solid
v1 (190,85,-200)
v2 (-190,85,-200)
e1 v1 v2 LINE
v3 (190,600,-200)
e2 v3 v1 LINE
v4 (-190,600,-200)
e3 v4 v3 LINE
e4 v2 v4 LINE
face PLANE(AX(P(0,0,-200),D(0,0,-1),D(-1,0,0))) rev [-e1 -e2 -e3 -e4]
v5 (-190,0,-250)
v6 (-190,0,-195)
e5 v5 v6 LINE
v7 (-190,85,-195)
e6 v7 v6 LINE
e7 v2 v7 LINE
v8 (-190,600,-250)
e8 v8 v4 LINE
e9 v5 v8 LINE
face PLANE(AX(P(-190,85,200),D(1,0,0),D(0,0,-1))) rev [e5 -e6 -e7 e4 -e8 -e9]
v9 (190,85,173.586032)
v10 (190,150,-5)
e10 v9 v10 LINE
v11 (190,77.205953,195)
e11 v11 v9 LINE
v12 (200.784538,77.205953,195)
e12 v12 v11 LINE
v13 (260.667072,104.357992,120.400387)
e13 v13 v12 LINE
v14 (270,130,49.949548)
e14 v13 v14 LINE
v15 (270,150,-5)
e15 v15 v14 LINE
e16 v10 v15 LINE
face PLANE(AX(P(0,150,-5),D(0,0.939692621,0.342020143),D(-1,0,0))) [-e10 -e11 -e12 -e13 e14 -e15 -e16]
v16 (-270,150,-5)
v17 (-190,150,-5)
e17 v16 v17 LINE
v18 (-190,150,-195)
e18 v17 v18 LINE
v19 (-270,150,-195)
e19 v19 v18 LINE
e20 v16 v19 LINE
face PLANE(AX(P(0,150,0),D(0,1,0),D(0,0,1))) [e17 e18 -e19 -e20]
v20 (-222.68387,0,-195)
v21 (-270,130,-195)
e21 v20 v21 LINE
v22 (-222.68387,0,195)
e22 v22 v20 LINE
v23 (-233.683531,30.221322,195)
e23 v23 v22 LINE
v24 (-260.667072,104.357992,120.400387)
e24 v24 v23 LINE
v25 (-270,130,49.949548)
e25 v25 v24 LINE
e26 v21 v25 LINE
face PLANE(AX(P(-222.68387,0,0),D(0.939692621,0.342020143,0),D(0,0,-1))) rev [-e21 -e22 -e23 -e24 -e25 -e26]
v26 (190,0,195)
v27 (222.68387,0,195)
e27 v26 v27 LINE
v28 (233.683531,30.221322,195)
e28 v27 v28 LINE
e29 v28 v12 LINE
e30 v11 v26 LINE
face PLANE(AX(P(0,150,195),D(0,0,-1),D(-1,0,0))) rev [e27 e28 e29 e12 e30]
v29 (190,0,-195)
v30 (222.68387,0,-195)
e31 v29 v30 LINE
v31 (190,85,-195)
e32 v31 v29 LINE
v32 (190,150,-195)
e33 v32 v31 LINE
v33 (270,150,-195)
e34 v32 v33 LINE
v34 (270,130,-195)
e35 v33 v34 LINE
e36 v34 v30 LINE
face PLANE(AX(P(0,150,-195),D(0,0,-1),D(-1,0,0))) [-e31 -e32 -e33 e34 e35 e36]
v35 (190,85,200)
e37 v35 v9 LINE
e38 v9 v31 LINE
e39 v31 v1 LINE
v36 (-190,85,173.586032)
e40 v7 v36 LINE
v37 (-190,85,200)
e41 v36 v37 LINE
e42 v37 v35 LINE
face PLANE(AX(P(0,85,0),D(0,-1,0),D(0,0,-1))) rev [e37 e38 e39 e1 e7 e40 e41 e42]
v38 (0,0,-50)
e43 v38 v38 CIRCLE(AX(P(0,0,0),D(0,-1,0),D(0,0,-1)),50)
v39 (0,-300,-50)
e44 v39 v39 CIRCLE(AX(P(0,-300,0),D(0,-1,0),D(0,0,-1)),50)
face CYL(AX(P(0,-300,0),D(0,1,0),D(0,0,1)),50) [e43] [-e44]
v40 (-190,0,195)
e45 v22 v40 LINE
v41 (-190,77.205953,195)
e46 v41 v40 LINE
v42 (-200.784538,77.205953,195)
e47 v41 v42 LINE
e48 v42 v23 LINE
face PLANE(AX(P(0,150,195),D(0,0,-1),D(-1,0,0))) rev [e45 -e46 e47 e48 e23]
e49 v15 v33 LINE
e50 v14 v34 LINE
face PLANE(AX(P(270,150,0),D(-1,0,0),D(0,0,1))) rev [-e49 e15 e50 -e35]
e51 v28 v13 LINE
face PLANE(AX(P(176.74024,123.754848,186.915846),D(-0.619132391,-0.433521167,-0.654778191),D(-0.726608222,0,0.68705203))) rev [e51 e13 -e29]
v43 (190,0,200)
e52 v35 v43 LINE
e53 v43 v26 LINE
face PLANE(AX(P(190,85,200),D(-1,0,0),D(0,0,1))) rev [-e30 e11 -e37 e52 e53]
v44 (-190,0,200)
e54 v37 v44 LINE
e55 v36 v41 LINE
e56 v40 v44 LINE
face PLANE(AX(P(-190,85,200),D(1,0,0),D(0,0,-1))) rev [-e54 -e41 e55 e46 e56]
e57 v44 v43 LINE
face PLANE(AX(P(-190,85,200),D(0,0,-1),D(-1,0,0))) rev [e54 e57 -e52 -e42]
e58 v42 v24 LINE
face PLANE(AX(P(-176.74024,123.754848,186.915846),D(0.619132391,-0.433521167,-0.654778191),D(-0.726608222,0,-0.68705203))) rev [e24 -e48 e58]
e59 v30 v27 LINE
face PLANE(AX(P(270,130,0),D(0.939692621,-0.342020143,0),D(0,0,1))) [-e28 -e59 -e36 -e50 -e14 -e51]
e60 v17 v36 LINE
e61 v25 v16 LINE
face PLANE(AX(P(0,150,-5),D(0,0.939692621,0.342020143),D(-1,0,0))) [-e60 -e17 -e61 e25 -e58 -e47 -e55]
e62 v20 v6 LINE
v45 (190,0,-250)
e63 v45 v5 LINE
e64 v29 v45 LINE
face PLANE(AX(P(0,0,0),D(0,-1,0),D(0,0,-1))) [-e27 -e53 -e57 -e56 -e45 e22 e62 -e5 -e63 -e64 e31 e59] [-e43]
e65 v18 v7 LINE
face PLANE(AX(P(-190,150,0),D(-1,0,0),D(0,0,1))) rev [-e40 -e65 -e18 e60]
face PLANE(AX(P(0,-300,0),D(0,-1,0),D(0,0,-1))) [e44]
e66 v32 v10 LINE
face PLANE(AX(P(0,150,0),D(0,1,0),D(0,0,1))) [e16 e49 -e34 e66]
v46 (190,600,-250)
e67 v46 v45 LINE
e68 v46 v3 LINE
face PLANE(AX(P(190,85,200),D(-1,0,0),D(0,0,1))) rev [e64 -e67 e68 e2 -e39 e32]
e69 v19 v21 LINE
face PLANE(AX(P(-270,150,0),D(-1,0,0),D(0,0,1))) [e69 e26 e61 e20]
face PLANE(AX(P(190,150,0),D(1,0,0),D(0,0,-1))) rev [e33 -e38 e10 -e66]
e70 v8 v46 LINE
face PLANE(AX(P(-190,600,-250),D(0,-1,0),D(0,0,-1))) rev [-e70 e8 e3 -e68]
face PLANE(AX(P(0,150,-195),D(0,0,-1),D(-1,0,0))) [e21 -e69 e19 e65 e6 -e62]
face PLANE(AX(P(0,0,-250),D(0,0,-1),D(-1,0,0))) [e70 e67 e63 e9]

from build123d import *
from OCP.BRepFilletAPI import BRepFilletAPI_MakeChamfer

# Parameters (mm, degrees)
SKETCH1_W           = 380
SKETCH1_H           = 400
BOSS_EXTRUDE1_DEPTH = 85
SKETCH2_W           = 80
SKETCH2_H           = 390
BOSS_EXTRUDE2_DEPTH = 150
CHAMFER1_SIZE       = 72.794046853
CHAMFER1_SIZE_2     = 200
CHAMFER2_SIZE       = 130
CHAMFER2_SIZE2      = 47.316130455
SKETCH3_W           = 380
SKETCH3_H           = 600
BOSS_EXTRUDE3_DEPTH = 50
SKETCH4_R           = 50
BOSS_EXTRUDE4_DEPTH = 300
CHAMFER3_START      = 285.464373586
CHAMFER3_OUTLINE_W  = 79
CHAMFER3_OUTLINE_H  = 106
CHAMFER3_DEPTH      = 30.956619547
CHAMFER4_START      = -316.420993133
CHAMFER4_OUTLINE_W  = 79
CHAMFER4_OUTLINE_H  = 106
CHAMFER4_DEPTH      = 30.956619547


with BuildPart() as part:
    # Sketch1 → Boss-Extrude1 (new body)
    with BuildSketch(Plane(origin=(0, 0, 0), x_dir=(1, 0, 0), z_dir=(0, 1, 0))):
        Rectangle(SKETCH1_W, SKETCH1_H)
    extrude(amount=BOSS_EXTRUDE1_DEPTH)

    # Sketch2 → Boss-Extrude2 (add)
    with BuildSketch(Plane(origin=(0, 0, 0), x_dir=(1, 0, 0), z_dir=(0, 1, 0))):
        with Locations((-230, 0)):
            Rectangle(SKETCH2_W, SKETCH2_H)
        with Locations((230, 0)):
            Rectangle(SKETCH2_W, SKETCH2_H)
    extrude(amount=BOSS_EXTRUDE2_DEPTH)

    # Chamfer1
    # the kernel refuses this chamfer: 200, 72.794046853 mm, written as the material it takes off along each edge
    with BuildSketch(Plane(origin=(-788.83894651, 150, 195), x_dir=(0, -1, 0), z_dir=(1, 0, 0)), Plane(origin=(190, 150, 195), x_dir=(0, -1, 0), z_dir=(1, 0, 0))) as chamfer1_piece_1:
        Polygon((CHAMFER1_SIZE, 0), (0, CHAMFER1_SIZE_2), (0, 0), align=None)
    extrude(amount=598.83894651, mode=Mode.SUBTRACT)
    with BuildSketch(Plane(origin=(-788.83894651, 150, 195), x_dir=(0, -1, 0), z_dir=(1, 0, 0))) as chamfer1_piece_2_section:
        Polygon((CHAMFER1_SIZE, 0), (0, CHAMFER1_SIZE_2), (0, 0), align=None)
    chamfer1_piece_2 = extrude(amount=1117.67789302, mode=Mode.PRIVATE)
    chamfer1_piece_2 = split(chamfer1_piece_2, bisect_by=Plane(origin=(190, 150, 195), z_dir=(1, 0, 0)), keep=Keep.TOP, mode=Mode.PRIVATE)
    add(chamfer1_piece_2, mode=Mode.SUBTRACT)
    with BuildSketch(Plane(origin=(-328.83894651, 150, 195), x_dir=(0, -1, 0), z_dir=(1, 0, 0))) as chamfer1_piece_3_section:
        Polygon((CHAMFER1_SIZE, 0), (0, CHAMFER1_SIZE_2), (0, 0), align=None)
    chamfer1_piece_3 = extrude(amount=1117.67789302, mode=Mode.PRIVATE)
    chamfer1_piece_3 = split(chamfer1_piece_3, bisect_by=Plane(origin=(-190, 150, 195), z_dir=(-1, 0, 0)), keep=Keep.TOP, mode=Mode.PRIVATE)
    add(chamfer1_piece_3, mode=Mode.SUBTRACT)

    # Chamfer2: one chamfer whose edges measure the first distance from different faces: ONE call of the kernel's chamfer builder (chamfer() names one face for all edges)
    chamfer2_edges_1 = [part.edges().sort_by_distance(p)[0] for p in [
        (270, 0, 0),
    ]]
    chamfer2_side_1 = [part.faces().sort_by_distance(p)[0] for p in [
        (270, 67.789562339, -18.238567166),
    ]]
    chamfer2_edges_2 = [part.edges().sort_by_distance(p)[0] for p in [
        (-270, 0, 0),
    ]]
    chamfer2_side_2 = [part.faces().sort_by_distance(p)[0] for p in [
        (-270, 67.789562339, -18.238567166),
    ]]
    chamfer2 = BRepFilletAPI_MakeChamfer(part.part.solid().wrapped)
    for e in chamfer2_edges_1:
        chamfer2.Add(CHAMFER2_SIZE, CHAMFER2_SIZE2, e.wrapped, chamfer2_side_1[0].wrapped)  # the first distance lies on this face
    for e in chamfer2_edges_2:
        chamfer2.Add(CHAMFER2_SIZE, CHAMFER2_SIZE2, e.wrapped, chamfer2_side_2[0].wrapped)  # the first distance lies on this face
    add(Compound.cast(chamfer2.Shape()), mode=Mode.REPLACE)

    # Sketch3 → Boss-Extrude3 (add)
    with BuildSketch(Plane(origin=(0, 0, -200), x_dir=(-1, 0, 0), z_dir=(0, 0, -1))):
        with Locations((0, 300)):
            Rectangle(SKETCH3_W, SKETCH3_H)
    extrude(amount=BOSS_EXTRUDE3_DEPTH)

    # Sketch4 → Boss-Extrude4 (add)
    with BuildSketch(Plane.XZ):
        with Locations(Location((0, 0, 0), (0, 0, 270))):
            Circle(SKETCH4_R)
    extrude(amount=BOSS_EXTRUDE4_DEPTH)

    # Chamfer3: read off the stored shape, not the designer's step
    # Chamfer3 outline → Chamfer3 (cut)
    with BuildSketch(Plane(origin=(0, 0, 0), x_dir=(0.7852866244263759, -0.34179494272055927, -0.5162374789064406), z_dir=(0.6191323909286511, 0.433521167278043, 0.6547781914701)).offset(CHAMFER3_START)):
        with Locations((68.5, -31)):
            Rectangle(CHAMFER3_OUTLINE_W, CHAMFER3_OUTLINE_H)
    extrude(amount=CHAMFER3_DEPTH, mode=Mode.SUBTRACT)

    # Chamfer4: read off the stored shape, not the designer's step
    # Chamfer4 outline → Chamfer4 (cut)
    with BuildSketch(Plane(origin=(0, 0, 0), x_dir=(0.7852866244263759, 0.34179494272055927, 0.5162374789064406), z_dir=(0.6191323909286511, -0.433521167278043, -0.6547781914701)).offset(CHAMFER4_START)):
        with Locations((-68.5, 31)):
            Rectangle(CHAMFER4_OUTLINE_W, CHAMFER4_OUTLINE_H)
    extrude(amount=CHAMFER4_DEPTH, mode=Mode.SUBTRACT)


solid = part.part
